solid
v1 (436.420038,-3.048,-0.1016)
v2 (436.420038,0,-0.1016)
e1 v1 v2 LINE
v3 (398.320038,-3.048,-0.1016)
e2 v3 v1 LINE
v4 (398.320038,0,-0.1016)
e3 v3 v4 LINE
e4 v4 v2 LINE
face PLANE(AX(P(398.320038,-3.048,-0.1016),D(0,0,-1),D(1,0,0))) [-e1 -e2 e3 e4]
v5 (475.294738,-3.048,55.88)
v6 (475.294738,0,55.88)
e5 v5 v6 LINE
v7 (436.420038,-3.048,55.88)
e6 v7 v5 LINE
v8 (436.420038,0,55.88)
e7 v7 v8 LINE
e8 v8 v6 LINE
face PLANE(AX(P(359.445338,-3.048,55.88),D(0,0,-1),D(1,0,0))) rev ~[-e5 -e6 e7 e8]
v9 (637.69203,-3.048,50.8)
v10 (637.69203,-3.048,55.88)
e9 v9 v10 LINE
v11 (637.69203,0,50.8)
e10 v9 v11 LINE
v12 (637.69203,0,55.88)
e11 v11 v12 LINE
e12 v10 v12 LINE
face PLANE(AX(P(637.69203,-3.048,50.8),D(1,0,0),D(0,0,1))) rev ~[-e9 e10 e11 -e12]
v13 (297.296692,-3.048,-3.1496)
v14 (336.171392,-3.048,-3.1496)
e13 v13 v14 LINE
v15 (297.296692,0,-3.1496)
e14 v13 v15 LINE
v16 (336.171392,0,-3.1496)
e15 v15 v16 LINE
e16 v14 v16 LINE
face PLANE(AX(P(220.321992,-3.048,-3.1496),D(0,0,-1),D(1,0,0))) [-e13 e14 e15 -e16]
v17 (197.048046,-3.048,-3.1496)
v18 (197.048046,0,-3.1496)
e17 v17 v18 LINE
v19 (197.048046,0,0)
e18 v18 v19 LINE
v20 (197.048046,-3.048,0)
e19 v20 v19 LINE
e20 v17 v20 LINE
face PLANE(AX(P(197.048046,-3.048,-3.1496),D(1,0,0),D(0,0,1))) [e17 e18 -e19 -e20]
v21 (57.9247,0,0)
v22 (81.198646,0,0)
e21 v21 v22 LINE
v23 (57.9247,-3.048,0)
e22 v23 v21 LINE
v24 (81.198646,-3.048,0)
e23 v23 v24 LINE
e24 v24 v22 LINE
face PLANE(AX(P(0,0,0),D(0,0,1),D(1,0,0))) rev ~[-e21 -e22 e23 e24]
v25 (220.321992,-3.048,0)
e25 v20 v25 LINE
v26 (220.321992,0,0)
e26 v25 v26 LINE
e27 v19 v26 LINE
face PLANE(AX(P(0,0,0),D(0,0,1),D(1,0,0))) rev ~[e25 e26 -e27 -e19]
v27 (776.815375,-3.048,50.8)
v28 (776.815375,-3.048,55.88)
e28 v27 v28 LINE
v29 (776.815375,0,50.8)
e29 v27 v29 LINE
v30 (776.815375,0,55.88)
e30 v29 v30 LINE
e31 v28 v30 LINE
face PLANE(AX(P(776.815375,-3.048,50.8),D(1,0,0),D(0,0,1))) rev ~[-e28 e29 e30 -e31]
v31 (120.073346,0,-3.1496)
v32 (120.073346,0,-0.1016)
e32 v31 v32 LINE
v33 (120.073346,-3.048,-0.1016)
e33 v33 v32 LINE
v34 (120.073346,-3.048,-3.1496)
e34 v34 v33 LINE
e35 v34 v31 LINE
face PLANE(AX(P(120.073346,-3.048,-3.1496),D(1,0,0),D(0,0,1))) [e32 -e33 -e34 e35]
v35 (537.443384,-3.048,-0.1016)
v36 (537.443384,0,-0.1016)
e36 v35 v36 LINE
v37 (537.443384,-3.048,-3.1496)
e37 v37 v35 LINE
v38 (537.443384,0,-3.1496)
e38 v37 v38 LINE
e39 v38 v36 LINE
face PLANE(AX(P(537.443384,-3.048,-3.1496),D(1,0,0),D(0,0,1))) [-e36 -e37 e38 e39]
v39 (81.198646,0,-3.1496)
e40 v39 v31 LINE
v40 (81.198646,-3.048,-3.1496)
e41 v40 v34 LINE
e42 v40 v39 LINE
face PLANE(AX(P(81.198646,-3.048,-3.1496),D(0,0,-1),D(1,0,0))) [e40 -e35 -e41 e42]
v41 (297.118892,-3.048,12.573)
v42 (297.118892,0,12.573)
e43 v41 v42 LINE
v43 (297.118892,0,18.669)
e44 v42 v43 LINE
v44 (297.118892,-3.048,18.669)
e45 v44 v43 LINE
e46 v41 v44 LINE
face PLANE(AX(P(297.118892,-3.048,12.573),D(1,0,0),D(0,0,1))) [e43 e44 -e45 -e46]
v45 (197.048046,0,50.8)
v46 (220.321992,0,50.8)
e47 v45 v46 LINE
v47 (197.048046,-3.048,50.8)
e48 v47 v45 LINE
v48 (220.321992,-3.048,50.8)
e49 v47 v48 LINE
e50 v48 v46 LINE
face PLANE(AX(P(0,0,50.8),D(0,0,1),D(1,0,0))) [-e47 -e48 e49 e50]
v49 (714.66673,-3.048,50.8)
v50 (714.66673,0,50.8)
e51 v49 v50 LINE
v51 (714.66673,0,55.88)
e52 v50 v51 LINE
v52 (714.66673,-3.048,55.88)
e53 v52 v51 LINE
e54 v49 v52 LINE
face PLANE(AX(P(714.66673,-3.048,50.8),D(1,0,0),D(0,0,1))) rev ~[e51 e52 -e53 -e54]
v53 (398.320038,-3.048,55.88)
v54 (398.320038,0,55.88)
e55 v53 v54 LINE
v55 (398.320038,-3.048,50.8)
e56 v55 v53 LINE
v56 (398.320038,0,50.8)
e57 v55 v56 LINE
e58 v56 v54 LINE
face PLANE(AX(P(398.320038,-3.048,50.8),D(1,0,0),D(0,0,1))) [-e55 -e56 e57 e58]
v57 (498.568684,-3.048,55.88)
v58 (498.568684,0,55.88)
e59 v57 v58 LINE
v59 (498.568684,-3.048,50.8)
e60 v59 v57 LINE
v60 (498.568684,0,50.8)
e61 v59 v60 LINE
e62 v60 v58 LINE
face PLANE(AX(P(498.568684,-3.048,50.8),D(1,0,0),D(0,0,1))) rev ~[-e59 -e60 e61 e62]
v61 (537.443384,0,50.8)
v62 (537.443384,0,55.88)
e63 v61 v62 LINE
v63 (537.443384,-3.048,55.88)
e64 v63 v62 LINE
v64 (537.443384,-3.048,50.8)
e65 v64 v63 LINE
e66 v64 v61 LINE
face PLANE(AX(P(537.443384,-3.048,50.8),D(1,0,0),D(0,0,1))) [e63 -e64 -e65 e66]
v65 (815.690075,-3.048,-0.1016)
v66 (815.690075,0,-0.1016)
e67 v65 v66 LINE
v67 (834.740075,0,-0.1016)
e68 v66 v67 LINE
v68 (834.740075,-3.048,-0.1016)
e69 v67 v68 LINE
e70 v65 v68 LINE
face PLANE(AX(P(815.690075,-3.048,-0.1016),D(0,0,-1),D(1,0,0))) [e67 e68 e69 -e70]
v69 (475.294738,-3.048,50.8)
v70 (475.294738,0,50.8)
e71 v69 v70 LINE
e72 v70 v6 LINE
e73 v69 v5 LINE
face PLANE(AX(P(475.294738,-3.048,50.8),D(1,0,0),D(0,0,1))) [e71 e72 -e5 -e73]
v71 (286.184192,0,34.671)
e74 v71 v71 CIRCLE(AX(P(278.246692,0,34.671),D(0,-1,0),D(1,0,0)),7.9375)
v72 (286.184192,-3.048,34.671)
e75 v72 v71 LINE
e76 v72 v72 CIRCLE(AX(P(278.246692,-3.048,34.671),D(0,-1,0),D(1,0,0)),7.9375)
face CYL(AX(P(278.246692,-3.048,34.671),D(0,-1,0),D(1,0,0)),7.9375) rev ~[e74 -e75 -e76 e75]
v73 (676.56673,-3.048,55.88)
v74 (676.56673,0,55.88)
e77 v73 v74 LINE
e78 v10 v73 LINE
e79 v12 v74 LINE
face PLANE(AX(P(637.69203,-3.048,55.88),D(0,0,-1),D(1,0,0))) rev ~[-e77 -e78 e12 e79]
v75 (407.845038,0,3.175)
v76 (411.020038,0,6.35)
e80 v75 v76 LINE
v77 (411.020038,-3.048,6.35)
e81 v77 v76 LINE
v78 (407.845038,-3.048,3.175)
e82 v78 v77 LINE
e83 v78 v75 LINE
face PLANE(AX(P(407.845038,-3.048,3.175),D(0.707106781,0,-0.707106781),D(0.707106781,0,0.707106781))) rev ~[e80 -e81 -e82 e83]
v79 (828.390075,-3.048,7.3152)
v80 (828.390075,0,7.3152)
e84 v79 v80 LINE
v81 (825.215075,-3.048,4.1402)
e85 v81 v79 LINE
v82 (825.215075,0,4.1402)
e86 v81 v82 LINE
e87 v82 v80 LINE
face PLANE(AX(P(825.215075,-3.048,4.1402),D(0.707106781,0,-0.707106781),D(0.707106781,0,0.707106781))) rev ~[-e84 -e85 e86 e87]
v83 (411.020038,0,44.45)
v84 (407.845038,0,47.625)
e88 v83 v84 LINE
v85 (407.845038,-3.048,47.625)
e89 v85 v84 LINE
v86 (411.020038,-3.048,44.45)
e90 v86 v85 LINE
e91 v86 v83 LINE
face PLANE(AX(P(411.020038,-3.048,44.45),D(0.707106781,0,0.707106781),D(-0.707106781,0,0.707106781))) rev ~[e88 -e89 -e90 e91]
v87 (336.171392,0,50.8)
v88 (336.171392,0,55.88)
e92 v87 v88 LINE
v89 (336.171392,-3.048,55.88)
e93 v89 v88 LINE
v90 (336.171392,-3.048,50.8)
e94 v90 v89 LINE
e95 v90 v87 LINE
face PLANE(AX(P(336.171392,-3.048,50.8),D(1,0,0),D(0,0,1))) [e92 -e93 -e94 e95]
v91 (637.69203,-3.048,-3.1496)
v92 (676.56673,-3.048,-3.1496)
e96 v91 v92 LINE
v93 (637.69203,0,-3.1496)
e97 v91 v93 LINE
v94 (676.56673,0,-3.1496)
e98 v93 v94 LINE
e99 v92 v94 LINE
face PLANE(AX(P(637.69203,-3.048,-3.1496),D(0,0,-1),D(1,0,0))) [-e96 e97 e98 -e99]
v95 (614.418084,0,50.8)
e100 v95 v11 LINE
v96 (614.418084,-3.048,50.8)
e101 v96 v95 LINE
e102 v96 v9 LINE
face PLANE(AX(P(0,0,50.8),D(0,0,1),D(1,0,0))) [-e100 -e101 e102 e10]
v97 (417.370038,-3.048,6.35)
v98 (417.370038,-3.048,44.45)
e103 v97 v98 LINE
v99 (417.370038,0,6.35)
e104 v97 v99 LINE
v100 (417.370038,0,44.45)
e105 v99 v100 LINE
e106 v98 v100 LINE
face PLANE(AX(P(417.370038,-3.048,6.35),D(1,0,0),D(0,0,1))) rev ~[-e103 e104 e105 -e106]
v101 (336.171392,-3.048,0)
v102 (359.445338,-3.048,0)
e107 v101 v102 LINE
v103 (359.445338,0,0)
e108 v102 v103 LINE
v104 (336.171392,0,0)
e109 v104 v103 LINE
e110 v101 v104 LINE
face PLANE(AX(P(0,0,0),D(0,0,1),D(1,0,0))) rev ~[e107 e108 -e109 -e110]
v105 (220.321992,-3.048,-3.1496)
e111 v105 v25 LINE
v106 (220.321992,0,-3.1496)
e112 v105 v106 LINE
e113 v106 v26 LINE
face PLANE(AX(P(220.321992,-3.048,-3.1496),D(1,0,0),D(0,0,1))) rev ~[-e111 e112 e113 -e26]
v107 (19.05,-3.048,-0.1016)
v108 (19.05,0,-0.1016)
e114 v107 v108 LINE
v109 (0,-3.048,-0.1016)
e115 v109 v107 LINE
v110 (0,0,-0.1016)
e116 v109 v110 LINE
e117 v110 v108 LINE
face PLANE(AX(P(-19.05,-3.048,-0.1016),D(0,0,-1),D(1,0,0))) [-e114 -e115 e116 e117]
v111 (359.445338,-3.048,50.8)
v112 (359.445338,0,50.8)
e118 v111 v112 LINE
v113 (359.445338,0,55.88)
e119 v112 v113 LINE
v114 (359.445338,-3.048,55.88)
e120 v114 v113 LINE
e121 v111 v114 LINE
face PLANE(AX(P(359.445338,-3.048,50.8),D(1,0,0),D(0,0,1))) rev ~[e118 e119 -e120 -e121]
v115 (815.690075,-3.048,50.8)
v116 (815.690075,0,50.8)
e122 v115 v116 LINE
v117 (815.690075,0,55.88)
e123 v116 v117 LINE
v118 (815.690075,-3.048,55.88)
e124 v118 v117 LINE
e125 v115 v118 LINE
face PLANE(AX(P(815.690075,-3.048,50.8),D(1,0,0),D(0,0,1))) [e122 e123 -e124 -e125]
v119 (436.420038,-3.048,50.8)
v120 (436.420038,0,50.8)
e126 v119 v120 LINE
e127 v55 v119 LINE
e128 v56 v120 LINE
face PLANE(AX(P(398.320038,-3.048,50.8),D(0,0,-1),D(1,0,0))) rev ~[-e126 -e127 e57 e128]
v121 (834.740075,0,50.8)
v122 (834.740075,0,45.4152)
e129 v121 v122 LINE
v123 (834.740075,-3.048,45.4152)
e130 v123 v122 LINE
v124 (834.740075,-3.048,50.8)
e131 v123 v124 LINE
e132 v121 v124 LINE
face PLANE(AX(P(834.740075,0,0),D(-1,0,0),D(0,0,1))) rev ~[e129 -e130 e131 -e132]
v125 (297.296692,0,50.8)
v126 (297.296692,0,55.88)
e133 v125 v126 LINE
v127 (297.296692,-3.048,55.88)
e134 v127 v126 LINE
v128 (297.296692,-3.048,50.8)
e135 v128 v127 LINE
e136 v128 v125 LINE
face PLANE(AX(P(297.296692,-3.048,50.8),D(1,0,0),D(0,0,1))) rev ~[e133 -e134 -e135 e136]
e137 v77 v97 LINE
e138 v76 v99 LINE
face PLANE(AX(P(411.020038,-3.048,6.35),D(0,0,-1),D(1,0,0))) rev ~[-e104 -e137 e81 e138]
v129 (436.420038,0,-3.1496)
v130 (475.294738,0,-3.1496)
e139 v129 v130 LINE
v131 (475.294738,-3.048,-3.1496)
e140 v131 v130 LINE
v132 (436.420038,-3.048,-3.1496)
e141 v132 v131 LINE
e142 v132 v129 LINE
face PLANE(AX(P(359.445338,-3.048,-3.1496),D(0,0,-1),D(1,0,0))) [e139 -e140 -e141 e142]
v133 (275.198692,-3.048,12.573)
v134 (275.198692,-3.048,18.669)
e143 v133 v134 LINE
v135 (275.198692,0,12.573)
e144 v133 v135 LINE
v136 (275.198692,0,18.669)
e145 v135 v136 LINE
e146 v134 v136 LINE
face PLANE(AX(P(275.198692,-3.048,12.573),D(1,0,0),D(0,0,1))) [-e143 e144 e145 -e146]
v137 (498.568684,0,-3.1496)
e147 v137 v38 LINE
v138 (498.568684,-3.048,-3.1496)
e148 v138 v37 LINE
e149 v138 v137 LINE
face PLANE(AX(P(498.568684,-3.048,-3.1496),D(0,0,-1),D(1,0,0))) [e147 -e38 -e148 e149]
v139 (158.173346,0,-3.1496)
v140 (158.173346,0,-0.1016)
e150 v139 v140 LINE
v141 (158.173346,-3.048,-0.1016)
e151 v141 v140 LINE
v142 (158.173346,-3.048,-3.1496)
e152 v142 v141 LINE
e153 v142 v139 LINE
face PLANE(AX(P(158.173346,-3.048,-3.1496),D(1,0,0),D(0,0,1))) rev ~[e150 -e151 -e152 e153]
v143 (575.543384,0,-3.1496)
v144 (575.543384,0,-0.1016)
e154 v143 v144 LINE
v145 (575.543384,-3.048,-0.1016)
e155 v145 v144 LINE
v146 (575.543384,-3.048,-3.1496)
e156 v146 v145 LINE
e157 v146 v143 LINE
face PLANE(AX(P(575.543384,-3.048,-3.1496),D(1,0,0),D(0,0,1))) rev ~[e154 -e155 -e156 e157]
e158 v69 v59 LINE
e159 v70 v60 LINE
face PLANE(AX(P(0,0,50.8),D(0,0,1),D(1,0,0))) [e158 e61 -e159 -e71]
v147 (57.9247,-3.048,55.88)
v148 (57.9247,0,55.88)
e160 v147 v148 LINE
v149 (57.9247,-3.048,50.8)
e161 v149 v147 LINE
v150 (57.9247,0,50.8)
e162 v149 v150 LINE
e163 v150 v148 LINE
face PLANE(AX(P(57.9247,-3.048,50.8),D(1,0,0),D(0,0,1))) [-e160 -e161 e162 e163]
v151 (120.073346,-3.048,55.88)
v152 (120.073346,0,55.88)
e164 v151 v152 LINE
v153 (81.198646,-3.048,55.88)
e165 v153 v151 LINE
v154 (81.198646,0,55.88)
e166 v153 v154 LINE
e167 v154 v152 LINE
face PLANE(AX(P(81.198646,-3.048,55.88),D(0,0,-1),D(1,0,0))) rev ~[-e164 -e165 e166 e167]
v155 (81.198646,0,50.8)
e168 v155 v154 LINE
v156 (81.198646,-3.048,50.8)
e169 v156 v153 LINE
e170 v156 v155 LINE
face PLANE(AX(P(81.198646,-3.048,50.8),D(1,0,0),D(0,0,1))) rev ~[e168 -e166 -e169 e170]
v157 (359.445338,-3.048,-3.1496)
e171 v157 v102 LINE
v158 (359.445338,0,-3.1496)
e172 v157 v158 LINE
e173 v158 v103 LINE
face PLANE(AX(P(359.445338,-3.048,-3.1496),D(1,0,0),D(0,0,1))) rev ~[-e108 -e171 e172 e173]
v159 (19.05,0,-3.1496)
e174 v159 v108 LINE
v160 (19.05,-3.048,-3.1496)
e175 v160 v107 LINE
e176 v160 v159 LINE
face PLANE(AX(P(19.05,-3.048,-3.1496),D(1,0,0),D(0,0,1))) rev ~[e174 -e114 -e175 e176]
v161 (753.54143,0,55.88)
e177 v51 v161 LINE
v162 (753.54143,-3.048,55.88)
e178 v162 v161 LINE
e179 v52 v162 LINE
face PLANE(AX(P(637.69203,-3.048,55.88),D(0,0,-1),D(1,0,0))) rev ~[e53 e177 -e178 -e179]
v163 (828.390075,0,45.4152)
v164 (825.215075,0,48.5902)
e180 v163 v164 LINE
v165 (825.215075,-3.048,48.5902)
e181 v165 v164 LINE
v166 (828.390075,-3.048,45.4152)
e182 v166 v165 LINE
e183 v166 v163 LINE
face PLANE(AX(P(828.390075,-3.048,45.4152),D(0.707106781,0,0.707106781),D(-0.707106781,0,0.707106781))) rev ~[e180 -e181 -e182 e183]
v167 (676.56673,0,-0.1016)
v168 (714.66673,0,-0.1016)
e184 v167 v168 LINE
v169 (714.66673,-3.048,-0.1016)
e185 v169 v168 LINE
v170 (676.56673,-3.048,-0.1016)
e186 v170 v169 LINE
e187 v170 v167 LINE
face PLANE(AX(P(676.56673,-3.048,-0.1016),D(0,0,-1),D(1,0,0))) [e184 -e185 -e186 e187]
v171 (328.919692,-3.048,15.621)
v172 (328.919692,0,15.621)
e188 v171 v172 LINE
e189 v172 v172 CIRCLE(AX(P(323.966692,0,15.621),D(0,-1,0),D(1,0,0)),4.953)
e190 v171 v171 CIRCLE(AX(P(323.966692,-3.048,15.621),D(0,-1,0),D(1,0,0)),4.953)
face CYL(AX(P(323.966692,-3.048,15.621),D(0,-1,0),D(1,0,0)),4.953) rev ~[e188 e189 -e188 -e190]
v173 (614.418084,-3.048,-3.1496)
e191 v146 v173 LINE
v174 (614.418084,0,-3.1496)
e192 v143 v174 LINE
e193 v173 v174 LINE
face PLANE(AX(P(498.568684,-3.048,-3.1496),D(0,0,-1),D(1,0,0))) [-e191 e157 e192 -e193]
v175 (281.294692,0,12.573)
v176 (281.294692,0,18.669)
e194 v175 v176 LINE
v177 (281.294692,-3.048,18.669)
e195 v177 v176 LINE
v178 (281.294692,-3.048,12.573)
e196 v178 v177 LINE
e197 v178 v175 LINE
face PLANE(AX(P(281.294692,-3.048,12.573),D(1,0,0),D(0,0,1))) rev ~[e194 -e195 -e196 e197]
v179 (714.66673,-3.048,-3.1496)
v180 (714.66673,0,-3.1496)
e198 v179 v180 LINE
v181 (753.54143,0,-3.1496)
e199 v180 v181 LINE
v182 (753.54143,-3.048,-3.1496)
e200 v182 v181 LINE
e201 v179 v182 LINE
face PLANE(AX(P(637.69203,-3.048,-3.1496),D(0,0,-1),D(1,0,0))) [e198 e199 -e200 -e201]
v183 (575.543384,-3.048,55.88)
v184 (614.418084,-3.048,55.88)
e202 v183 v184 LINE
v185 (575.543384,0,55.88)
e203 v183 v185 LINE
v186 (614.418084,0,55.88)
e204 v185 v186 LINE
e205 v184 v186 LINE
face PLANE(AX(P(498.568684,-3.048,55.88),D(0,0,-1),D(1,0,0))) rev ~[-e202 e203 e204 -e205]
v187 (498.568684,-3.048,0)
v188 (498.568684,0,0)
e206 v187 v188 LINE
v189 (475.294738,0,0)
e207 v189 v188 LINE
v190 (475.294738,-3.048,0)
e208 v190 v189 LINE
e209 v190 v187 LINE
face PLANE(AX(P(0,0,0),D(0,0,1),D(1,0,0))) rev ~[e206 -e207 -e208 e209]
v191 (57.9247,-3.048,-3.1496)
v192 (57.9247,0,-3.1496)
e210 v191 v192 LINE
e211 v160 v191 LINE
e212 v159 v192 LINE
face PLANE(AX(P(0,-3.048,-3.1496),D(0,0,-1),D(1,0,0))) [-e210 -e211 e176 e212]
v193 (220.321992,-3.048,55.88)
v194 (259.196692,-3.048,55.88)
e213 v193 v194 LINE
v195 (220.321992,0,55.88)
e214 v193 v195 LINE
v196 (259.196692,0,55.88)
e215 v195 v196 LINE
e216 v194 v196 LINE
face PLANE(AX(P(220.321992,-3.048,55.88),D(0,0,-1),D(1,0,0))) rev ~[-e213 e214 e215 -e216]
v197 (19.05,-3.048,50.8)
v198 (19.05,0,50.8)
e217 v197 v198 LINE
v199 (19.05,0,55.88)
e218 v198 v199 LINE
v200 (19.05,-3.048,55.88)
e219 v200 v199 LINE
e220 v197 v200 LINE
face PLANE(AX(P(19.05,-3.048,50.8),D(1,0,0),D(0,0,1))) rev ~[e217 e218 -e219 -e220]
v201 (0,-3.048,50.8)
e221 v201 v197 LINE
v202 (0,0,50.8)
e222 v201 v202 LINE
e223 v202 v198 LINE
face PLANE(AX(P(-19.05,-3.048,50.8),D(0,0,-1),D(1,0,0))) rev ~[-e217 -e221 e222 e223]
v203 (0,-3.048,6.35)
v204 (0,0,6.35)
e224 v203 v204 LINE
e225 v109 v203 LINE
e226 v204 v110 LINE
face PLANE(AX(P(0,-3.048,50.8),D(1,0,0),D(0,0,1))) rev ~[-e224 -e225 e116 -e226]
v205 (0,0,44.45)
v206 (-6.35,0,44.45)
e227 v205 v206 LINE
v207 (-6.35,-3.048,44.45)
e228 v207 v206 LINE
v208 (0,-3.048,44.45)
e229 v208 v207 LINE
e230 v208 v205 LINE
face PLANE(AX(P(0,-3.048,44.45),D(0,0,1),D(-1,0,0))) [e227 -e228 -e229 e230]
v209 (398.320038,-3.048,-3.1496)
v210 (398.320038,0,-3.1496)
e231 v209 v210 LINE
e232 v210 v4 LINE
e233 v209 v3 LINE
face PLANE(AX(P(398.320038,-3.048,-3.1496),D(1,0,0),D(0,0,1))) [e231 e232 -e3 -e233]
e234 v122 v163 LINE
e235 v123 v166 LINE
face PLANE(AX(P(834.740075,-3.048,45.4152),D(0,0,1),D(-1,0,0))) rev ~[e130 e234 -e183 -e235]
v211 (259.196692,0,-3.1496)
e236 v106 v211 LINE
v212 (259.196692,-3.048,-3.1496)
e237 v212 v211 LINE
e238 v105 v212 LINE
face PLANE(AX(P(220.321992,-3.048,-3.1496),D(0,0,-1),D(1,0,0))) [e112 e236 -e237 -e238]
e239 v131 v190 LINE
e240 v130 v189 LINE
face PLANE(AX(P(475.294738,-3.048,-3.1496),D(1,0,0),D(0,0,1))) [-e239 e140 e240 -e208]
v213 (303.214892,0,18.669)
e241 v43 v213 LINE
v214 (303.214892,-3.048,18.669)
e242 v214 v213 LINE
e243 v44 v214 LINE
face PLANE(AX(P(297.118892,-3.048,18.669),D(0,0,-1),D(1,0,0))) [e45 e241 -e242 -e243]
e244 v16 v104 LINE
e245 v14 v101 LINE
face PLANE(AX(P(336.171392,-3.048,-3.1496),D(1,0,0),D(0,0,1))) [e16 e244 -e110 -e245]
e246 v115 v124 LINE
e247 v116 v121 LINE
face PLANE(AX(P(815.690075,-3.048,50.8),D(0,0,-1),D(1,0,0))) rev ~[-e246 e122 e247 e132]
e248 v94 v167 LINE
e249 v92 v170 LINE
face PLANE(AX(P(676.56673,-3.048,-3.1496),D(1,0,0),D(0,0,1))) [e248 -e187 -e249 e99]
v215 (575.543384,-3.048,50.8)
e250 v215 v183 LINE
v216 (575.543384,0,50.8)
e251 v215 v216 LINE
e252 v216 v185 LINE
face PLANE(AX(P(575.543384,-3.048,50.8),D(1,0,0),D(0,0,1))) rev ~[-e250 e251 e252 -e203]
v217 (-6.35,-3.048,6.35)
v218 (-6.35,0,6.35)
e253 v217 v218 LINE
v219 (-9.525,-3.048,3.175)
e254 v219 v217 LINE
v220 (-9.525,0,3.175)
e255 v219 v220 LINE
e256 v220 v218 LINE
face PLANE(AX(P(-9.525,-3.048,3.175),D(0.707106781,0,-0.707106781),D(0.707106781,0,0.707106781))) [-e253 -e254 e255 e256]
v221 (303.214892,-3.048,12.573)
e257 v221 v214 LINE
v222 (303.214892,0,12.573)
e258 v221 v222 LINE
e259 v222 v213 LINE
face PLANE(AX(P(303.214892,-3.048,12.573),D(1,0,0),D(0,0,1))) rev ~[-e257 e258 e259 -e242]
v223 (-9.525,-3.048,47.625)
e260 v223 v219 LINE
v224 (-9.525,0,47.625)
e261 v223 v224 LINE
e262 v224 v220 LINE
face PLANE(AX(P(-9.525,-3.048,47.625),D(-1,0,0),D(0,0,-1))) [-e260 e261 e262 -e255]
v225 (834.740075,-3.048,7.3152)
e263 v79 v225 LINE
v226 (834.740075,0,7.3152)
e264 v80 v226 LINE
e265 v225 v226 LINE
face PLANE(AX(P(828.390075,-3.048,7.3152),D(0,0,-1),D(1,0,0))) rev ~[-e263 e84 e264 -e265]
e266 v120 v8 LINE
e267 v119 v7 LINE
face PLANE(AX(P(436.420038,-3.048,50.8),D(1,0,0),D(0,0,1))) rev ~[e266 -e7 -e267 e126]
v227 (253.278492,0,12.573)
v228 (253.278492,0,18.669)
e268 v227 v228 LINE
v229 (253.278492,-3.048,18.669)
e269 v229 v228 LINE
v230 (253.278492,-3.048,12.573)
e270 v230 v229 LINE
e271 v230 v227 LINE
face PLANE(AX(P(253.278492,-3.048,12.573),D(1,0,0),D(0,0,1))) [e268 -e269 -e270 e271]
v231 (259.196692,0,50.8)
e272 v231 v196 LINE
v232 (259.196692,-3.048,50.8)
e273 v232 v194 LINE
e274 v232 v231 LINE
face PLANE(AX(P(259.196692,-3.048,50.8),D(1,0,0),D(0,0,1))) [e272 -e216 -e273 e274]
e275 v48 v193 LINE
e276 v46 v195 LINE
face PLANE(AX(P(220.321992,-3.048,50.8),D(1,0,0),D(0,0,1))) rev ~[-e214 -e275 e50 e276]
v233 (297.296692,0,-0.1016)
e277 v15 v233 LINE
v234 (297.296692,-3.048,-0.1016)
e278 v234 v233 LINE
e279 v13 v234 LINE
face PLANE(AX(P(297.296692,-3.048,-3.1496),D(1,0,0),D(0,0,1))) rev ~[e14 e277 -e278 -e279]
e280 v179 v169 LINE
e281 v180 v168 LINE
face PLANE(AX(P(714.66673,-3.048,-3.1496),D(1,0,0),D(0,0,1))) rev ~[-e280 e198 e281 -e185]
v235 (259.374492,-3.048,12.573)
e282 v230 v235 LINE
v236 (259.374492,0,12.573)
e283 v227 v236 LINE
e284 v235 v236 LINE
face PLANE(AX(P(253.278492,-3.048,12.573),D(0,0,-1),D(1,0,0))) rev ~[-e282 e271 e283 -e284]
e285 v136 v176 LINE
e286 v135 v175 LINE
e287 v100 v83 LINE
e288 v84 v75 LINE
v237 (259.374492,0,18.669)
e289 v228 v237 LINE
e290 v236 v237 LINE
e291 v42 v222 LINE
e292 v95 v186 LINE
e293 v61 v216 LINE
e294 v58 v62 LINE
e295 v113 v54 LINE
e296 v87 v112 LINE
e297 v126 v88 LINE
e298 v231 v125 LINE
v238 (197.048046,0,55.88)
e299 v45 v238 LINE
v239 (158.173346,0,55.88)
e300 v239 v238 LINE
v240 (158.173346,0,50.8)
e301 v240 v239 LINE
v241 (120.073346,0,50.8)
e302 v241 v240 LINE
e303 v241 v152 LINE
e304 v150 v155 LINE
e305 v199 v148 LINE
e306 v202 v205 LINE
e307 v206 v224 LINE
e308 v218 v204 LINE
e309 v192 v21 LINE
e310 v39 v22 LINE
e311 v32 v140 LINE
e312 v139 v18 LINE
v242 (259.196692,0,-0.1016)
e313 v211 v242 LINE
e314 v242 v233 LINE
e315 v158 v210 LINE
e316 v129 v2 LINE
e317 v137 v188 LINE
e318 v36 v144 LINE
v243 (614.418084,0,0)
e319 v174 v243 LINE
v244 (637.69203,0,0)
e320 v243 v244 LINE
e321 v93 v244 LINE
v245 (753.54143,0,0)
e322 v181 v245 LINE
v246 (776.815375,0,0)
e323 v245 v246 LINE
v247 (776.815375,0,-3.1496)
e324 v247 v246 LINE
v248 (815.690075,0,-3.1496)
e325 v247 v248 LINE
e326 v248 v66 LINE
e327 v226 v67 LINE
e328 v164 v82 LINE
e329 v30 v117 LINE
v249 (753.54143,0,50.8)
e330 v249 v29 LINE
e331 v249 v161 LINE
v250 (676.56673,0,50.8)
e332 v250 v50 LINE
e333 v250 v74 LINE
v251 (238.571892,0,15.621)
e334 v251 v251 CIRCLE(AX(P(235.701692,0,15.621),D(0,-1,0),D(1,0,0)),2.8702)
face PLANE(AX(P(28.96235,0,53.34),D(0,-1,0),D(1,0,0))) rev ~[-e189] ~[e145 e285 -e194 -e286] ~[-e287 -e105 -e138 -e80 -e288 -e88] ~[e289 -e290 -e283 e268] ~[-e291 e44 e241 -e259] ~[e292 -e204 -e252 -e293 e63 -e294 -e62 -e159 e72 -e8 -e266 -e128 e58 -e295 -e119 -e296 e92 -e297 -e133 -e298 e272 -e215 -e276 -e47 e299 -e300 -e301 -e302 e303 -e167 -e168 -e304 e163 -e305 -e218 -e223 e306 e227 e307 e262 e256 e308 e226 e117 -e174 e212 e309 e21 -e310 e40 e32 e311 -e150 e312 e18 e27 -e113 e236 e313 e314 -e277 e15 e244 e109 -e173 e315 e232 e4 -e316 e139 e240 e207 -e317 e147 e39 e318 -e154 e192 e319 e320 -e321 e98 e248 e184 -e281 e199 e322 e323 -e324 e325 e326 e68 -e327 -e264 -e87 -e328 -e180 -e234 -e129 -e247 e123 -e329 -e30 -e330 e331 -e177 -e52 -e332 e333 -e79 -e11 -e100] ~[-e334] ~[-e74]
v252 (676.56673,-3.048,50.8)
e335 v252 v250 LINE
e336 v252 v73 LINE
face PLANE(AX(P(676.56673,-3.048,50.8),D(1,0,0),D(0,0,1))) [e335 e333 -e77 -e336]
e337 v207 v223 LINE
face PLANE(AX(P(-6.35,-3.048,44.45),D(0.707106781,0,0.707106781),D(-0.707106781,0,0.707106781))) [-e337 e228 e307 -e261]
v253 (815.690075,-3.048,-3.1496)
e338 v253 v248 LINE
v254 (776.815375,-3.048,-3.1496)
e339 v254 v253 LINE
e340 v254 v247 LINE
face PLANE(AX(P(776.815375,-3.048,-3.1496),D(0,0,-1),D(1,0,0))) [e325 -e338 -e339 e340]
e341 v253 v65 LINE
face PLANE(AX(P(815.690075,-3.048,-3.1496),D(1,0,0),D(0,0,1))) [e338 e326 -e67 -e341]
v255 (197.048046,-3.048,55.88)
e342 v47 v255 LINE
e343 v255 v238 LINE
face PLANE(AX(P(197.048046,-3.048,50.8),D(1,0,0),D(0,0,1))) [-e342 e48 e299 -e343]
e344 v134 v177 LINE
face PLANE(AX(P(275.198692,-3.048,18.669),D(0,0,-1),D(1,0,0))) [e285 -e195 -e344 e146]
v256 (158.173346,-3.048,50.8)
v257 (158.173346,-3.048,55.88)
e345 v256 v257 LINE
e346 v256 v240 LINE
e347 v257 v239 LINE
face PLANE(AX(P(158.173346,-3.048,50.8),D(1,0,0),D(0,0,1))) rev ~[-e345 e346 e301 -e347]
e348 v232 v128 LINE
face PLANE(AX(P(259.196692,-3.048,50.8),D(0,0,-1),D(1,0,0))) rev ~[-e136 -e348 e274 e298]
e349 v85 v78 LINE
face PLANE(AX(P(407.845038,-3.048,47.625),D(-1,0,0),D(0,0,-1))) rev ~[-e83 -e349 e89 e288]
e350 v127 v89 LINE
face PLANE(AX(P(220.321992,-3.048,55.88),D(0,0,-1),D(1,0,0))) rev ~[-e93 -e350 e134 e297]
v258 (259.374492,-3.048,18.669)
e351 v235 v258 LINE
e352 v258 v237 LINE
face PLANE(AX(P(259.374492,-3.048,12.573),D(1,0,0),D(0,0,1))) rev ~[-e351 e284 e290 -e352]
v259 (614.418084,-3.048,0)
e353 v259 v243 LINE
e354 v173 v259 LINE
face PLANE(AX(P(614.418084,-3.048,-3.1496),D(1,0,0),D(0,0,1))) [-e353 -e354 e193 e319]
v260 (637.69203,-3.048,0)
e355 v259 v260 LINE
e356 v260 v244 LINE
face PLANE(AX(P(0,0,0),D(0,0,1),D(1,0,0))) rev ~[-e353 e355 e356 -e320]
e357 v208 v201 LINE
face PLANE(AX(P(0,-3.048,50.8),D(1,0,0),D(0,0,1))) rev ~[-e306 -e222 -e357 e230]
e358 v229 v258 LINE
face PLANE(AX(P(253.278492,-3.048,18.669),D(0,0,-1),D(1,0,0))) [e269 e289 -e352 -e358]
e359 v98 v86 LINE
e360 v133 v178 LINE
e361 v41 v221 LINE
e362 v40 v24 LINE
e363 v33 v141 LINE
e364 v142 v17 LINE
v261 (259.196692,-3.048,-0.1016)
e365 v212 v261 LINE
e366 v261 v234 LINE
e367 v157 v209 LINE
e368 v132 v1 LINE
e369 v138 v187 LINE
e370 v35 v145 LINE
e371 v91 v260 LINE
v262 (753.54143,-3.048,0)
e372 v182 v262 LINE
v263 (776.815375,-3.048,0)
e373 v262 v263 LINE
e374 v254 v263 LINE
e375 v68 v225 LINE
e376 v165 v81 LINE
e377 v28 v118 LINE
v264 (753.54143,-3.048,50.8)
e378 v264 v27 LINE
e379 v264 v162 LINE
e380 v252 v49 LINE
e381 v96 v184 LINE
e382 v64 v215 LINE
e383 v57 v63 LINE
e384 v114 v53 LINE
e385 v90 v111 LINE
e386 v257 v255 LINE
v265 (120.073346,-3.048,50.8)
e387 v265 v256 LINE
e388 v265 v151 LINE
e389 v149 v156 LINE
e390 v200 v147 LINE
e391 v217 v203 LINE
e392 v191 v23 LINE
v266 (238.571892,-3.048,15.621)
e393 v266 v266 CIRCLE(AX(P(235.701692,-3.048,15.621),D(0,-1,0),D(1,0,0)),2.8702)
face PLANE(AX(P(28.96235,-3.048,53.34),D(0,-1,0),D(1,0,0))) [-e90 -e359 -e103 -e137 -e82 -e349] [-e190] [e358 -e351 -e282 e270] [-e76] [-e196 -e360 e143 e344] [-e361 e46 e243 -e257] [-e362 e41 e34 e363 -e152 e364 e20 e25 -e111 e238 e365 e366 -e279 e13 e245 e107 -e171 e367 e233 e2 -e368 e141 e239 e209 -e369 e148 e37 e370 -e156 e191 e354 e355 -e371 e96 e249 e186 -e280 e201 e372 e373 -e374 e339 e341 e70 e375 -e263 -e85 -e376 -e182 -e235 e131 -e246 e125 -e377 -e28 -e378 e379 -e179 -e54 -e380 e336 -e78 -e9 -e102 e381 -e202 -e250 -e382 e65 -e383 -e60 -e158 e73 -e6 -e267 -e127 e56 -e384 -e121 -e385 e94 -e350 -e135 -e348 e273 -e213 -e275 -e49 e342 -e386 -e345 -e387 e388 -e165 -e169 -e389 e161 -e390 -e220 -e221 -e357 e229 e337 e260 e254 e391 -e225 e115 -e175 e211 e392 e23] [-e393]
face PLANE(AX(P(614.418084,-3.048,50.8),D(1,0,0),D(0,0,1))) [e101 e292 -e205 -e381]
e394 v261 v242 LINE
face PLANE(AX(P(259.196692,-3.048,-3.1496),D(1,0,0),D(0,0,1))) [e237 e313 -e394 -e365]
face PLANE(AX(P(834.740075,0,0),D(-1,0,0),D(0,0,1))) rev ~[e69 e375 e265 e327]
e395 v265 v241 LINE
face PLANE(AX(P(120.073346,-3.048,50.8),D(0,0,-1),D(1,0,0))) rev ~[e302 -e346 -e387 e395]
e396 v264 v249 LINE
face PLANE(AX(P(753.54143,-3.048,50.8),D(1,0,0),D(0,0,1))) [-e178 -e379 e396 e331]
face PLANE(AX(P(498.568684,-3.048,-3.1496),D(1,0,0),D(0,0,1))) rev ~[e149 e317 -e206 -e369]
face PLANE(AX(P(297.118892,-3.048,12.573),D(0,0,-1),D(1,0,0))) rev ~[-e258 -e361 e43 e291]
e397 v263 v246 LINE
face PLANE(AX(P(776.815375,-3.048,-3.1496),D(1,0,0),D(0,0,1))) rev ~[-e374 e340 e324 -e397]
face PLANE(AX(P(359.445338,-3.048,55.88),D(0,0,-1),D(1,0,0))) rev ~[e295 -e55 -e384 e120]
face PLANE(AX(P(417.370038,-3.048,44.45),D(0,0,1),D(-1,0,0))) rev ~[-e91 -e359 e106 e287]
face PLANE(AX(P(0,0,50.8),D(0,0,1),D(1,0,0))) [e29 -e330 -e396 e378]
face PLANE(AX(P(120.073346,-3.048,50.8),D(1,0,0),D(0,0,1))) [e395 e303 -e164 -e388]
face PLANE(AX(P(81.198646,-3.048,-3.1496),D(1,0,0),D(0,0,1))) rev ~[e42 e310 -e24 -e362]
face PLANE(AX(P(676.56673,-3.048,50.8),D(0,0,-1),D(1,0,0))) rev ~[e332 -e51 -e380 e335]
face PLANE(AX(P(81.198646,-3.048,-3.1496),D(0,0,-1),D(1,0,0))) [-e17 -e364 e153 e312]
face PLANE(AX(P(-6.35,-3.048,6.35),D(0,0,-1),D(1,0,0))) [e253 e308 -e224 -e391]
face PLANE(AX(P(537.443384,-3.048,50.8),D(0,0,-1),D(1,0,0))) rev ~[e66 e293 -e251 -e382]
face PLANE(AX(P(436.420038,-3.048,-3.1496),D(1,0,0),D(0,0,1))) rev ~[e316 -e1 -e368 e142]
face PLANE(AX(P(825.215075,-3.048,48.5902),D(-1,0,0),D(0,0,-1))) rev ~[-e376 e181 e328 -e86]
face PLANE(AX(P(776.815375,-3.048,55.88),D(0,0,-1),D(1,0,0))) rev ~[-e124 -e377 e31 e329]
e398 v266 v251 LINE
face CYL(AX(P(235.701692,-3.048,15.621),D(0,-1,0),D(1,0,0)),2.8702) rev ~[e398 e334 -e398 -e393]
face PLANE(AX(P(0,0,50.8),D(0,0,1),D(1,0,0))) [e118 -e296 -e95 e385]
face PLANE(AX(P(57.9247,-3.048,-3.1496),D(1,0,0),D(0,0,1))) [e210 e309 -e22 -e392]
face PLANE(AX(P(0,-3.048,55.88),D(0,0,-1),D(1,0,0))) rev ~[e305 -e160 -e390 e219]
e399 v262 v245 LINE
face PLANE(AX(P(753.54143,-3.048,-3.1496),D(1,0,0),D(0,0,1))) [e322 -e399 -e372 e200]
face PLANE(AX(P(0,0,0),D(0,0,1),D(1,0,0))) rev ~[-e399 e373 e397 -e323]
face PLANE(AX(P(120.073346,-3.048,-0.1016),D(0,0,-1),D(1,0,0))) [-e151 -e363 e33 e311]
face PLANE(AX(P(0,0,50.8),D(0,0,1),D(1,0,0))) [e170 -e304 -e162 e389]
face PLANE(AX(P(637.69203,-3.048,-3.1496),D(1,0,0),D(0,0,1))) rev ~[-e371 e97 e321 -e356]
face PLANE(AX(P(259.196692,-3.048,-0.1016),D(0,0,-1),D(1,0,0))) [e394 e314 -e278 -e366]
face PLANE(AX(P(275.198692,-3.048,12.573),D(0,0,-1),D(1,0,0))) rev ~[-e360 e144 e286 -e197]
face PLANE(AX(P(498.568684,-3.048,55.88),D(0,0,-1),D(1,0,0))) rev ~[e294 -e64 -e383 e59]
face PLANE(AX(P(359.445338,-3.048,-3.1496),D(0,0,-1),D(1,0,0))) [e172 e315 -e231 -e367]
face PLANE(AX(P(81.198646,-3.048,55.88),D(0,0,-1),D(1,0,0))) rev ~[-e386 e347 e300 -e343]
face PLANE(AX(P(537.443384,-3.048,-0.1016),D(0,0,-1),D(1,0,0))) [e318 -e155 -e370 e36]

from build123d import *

# Parameters (mm, degrees)
F0_W      = 834.7400754492
F0_H      = 50.8
F1_DEPTH  = 3.048
F3_W      = 57.9247
F3_H      = 5.08
F3_W_2    = 115.8494
F3_H_2    = 3.1496
F4_DEPTH  = 3.048
F6_DEPTH  = 3.048
F7_DEPTH  = 3.049
F9_W      = 6.096
F9_H      = 6.096
F9_R      = 2.8702
F9_R_2    = 4.953
F9_R_3    = 7.9375
F10_DEPTH = 3.049
F11_DEPTH = 25.4
F12_W     = 38.1
F12_H     = 3.048
F12_H_2   = 5.08
F13_DEPTH = 3.048


# Not quite as in the source:
# - a feature names something its author has since deleted; it is built from what else it names


with BuildPart() as f1:
    # F0 (on Front) → F1 (new body)
    with BuildSketch(Plane.XZ):
        with Locations((417.3700377246, 25.4)):
            Rectangle(F0_W, F0_H)
    extrude(amount=F1_DEPTH)

    # F3 (on face) → F4 (join)
    with BuildSketch(Plane.XZ.offset(3.048)):
        with Locations((28.96235, 53.34)):
            Rectangle(F3_W, F3_H)
        with Locations((139.1233459082, 53.34)):
            Rectangle(F3_W_2, F3_H)
        with Locations((278.2466918164, 53.34)):
            Rectangle(F3_W_2, F3_H)
        with Locations((417.3700377246, 53.34)):
            Rectangle(F3_W_2, F3_H)
        with Locations((556.4933836328, 53.34)):
            Rectangle(F3_W_2, F3_H)
        with Locations((695.616729541, 53.34)):
            Rectangle(F3_W_2, F3_H)
        with Locations((805.7777254492, 53.34)):
            Rectangle(F3_W, F3_H)
        with Locations((28.96235, -1.5748)):
            Rectangle(F3_W, F3_H_2)
        with Locations((139.1233459082, -1.5748)):
            Rectangle(F3_W_2, F3_H_2)
        with Locations((278.2466918164, -1.5748)):
            Rectangle(F3_W_2, F3_H_2)
        with Locations((417.3700377246, -1.5748)):
            Rectangle(F3_W_2, F3_H_2)
        with Locations((556.4933836328, -1.5748)):
            Rectangle(F3_W_2, F3_H_2)
        with Locations((695.616729541, -1.5748)):
            Rectangle(F3_W_2, F3_H_2)
        with Locations((805.7777254492, -1.5748)):
            Rectangle(F3_W, F3_H_2)
    extrude(amount=-F4_DEPTH)

    # F5 (on face) → F6 (join)
    with BuildSketch(Plane.XZ.offset(3.048)):
        Polygon((-6.35, 6.35), (0, 6.35), (0, 44.45), (-6.35, 44.45), (-9.525, 47.625), (-9.525, 3.175), align=None)
    extrude(amount=-F6_DEPTH)

    # F5 (on face) → F7 (cut, through all)
    with BuildSketch(Plane.XZ.offset(3.048)):
        Polygon((828.3900754492, 7.3152), (834.7400754492, 7.3152), (834.7400754492, 45.4152), (828.3900754492, 45.4152), (825.2150754492, 48.5902), (825.2150754492, 4.1402), align=None)
    extrude(amount=-F7_DEPTH, mode=Mode.SUBTRACT)

    # F9 (on face) → F10 (cut, through all)
    with BuildSketch(Plane.XZ.offset(3.048)):
        with Locations((256.3264918164, 15.621)):
            Rectangle(F9_W, F9_H)
        with Locations((278.2466918164, 15.621)):
            Rectangle(F9_W, F9_H)
        with Locations((300.1668918164, 15.621)):
            Rectangle(F9_W, F9_H)
        with Locations((235.7016918164, 15.621)):
            Circle(F9_R)
        with Locations((323.9666918164, 15.621)):
            Circle(F9_R_2)
        with Locations((278.2466918164, 34.671)):
            Circle(F9_R_3)
    extrude(amount=-F10_DEPTH, mode=Mode.SUBTRACT)

    # F8 (on face) → F11 (cut)
    with BuildSketch(Plane.XZ.offset(3.048)):
        Polygon((411.0200377246, 6.35), (417.3700377246, 6.35), (417.3700377246, 44.45), (411.0200377246, 44.45), (407.8450377246, 47.625), (407.8450377246, 3.175), align=None)
    extrude(amount=-F11_DEPTH, mode=Mode.SUBTRACT)

    # F12 (on face) → F13 (cut, through all)
    with BuildSketch(Plane.XZ.offset(3.048)):
        with Locations((139.1233459082, -1.6256)):
            Rectangle(F12_W, F12_H)
        with Locations((278.2466918164, -1.6256)):
            Rectangle(F12_W, F12_H)
        with Locations((417.3700377246, -1.6256)):
            Rectangle(F12_W, F12_H)
        with Locations((556.4933836328, -1.6256)):
            Rectangle(F12_W, F12_H)
        with Locations((695.616729541, -1.6256)):
            Rectangle(F12_W, F12_H)
        with Locations((834.7400754492, -1.6256)):
            Rectangle(F12_W, F12_H)
        with Locations((0, -1.6256)):
            Rectangle(F12_W, F12_H)
        with Locations((0, 53.34)):
            Rectangle(F12_W, F12_H_2)
        with Locations((139.1233459082, 53.34)):
            Rectangle(F12_W, F12_H_2)
        with Locations((278.2466918164, 53.34)):
            Rectangle(F12_W, F12_H_2)
        with Locations((417.3700377246, 53.34)):
            Rectangle(F12_W, F12_H_2)
        with Locations((556.4933836328, 53.34)):
            Rectangle(F12_W, F12_H_2)
        with Locations((695.616729541, 53.34)):
            Rectangle(F12_W, F12_H_2)
        with Locations((834.7400754492, 53.34)):
            Rectangle(F12_W, F12_H_2)
    extrude(amount=-F13_DEPTH, mode=Mode.SUBTRACT)


solid = f1.part
